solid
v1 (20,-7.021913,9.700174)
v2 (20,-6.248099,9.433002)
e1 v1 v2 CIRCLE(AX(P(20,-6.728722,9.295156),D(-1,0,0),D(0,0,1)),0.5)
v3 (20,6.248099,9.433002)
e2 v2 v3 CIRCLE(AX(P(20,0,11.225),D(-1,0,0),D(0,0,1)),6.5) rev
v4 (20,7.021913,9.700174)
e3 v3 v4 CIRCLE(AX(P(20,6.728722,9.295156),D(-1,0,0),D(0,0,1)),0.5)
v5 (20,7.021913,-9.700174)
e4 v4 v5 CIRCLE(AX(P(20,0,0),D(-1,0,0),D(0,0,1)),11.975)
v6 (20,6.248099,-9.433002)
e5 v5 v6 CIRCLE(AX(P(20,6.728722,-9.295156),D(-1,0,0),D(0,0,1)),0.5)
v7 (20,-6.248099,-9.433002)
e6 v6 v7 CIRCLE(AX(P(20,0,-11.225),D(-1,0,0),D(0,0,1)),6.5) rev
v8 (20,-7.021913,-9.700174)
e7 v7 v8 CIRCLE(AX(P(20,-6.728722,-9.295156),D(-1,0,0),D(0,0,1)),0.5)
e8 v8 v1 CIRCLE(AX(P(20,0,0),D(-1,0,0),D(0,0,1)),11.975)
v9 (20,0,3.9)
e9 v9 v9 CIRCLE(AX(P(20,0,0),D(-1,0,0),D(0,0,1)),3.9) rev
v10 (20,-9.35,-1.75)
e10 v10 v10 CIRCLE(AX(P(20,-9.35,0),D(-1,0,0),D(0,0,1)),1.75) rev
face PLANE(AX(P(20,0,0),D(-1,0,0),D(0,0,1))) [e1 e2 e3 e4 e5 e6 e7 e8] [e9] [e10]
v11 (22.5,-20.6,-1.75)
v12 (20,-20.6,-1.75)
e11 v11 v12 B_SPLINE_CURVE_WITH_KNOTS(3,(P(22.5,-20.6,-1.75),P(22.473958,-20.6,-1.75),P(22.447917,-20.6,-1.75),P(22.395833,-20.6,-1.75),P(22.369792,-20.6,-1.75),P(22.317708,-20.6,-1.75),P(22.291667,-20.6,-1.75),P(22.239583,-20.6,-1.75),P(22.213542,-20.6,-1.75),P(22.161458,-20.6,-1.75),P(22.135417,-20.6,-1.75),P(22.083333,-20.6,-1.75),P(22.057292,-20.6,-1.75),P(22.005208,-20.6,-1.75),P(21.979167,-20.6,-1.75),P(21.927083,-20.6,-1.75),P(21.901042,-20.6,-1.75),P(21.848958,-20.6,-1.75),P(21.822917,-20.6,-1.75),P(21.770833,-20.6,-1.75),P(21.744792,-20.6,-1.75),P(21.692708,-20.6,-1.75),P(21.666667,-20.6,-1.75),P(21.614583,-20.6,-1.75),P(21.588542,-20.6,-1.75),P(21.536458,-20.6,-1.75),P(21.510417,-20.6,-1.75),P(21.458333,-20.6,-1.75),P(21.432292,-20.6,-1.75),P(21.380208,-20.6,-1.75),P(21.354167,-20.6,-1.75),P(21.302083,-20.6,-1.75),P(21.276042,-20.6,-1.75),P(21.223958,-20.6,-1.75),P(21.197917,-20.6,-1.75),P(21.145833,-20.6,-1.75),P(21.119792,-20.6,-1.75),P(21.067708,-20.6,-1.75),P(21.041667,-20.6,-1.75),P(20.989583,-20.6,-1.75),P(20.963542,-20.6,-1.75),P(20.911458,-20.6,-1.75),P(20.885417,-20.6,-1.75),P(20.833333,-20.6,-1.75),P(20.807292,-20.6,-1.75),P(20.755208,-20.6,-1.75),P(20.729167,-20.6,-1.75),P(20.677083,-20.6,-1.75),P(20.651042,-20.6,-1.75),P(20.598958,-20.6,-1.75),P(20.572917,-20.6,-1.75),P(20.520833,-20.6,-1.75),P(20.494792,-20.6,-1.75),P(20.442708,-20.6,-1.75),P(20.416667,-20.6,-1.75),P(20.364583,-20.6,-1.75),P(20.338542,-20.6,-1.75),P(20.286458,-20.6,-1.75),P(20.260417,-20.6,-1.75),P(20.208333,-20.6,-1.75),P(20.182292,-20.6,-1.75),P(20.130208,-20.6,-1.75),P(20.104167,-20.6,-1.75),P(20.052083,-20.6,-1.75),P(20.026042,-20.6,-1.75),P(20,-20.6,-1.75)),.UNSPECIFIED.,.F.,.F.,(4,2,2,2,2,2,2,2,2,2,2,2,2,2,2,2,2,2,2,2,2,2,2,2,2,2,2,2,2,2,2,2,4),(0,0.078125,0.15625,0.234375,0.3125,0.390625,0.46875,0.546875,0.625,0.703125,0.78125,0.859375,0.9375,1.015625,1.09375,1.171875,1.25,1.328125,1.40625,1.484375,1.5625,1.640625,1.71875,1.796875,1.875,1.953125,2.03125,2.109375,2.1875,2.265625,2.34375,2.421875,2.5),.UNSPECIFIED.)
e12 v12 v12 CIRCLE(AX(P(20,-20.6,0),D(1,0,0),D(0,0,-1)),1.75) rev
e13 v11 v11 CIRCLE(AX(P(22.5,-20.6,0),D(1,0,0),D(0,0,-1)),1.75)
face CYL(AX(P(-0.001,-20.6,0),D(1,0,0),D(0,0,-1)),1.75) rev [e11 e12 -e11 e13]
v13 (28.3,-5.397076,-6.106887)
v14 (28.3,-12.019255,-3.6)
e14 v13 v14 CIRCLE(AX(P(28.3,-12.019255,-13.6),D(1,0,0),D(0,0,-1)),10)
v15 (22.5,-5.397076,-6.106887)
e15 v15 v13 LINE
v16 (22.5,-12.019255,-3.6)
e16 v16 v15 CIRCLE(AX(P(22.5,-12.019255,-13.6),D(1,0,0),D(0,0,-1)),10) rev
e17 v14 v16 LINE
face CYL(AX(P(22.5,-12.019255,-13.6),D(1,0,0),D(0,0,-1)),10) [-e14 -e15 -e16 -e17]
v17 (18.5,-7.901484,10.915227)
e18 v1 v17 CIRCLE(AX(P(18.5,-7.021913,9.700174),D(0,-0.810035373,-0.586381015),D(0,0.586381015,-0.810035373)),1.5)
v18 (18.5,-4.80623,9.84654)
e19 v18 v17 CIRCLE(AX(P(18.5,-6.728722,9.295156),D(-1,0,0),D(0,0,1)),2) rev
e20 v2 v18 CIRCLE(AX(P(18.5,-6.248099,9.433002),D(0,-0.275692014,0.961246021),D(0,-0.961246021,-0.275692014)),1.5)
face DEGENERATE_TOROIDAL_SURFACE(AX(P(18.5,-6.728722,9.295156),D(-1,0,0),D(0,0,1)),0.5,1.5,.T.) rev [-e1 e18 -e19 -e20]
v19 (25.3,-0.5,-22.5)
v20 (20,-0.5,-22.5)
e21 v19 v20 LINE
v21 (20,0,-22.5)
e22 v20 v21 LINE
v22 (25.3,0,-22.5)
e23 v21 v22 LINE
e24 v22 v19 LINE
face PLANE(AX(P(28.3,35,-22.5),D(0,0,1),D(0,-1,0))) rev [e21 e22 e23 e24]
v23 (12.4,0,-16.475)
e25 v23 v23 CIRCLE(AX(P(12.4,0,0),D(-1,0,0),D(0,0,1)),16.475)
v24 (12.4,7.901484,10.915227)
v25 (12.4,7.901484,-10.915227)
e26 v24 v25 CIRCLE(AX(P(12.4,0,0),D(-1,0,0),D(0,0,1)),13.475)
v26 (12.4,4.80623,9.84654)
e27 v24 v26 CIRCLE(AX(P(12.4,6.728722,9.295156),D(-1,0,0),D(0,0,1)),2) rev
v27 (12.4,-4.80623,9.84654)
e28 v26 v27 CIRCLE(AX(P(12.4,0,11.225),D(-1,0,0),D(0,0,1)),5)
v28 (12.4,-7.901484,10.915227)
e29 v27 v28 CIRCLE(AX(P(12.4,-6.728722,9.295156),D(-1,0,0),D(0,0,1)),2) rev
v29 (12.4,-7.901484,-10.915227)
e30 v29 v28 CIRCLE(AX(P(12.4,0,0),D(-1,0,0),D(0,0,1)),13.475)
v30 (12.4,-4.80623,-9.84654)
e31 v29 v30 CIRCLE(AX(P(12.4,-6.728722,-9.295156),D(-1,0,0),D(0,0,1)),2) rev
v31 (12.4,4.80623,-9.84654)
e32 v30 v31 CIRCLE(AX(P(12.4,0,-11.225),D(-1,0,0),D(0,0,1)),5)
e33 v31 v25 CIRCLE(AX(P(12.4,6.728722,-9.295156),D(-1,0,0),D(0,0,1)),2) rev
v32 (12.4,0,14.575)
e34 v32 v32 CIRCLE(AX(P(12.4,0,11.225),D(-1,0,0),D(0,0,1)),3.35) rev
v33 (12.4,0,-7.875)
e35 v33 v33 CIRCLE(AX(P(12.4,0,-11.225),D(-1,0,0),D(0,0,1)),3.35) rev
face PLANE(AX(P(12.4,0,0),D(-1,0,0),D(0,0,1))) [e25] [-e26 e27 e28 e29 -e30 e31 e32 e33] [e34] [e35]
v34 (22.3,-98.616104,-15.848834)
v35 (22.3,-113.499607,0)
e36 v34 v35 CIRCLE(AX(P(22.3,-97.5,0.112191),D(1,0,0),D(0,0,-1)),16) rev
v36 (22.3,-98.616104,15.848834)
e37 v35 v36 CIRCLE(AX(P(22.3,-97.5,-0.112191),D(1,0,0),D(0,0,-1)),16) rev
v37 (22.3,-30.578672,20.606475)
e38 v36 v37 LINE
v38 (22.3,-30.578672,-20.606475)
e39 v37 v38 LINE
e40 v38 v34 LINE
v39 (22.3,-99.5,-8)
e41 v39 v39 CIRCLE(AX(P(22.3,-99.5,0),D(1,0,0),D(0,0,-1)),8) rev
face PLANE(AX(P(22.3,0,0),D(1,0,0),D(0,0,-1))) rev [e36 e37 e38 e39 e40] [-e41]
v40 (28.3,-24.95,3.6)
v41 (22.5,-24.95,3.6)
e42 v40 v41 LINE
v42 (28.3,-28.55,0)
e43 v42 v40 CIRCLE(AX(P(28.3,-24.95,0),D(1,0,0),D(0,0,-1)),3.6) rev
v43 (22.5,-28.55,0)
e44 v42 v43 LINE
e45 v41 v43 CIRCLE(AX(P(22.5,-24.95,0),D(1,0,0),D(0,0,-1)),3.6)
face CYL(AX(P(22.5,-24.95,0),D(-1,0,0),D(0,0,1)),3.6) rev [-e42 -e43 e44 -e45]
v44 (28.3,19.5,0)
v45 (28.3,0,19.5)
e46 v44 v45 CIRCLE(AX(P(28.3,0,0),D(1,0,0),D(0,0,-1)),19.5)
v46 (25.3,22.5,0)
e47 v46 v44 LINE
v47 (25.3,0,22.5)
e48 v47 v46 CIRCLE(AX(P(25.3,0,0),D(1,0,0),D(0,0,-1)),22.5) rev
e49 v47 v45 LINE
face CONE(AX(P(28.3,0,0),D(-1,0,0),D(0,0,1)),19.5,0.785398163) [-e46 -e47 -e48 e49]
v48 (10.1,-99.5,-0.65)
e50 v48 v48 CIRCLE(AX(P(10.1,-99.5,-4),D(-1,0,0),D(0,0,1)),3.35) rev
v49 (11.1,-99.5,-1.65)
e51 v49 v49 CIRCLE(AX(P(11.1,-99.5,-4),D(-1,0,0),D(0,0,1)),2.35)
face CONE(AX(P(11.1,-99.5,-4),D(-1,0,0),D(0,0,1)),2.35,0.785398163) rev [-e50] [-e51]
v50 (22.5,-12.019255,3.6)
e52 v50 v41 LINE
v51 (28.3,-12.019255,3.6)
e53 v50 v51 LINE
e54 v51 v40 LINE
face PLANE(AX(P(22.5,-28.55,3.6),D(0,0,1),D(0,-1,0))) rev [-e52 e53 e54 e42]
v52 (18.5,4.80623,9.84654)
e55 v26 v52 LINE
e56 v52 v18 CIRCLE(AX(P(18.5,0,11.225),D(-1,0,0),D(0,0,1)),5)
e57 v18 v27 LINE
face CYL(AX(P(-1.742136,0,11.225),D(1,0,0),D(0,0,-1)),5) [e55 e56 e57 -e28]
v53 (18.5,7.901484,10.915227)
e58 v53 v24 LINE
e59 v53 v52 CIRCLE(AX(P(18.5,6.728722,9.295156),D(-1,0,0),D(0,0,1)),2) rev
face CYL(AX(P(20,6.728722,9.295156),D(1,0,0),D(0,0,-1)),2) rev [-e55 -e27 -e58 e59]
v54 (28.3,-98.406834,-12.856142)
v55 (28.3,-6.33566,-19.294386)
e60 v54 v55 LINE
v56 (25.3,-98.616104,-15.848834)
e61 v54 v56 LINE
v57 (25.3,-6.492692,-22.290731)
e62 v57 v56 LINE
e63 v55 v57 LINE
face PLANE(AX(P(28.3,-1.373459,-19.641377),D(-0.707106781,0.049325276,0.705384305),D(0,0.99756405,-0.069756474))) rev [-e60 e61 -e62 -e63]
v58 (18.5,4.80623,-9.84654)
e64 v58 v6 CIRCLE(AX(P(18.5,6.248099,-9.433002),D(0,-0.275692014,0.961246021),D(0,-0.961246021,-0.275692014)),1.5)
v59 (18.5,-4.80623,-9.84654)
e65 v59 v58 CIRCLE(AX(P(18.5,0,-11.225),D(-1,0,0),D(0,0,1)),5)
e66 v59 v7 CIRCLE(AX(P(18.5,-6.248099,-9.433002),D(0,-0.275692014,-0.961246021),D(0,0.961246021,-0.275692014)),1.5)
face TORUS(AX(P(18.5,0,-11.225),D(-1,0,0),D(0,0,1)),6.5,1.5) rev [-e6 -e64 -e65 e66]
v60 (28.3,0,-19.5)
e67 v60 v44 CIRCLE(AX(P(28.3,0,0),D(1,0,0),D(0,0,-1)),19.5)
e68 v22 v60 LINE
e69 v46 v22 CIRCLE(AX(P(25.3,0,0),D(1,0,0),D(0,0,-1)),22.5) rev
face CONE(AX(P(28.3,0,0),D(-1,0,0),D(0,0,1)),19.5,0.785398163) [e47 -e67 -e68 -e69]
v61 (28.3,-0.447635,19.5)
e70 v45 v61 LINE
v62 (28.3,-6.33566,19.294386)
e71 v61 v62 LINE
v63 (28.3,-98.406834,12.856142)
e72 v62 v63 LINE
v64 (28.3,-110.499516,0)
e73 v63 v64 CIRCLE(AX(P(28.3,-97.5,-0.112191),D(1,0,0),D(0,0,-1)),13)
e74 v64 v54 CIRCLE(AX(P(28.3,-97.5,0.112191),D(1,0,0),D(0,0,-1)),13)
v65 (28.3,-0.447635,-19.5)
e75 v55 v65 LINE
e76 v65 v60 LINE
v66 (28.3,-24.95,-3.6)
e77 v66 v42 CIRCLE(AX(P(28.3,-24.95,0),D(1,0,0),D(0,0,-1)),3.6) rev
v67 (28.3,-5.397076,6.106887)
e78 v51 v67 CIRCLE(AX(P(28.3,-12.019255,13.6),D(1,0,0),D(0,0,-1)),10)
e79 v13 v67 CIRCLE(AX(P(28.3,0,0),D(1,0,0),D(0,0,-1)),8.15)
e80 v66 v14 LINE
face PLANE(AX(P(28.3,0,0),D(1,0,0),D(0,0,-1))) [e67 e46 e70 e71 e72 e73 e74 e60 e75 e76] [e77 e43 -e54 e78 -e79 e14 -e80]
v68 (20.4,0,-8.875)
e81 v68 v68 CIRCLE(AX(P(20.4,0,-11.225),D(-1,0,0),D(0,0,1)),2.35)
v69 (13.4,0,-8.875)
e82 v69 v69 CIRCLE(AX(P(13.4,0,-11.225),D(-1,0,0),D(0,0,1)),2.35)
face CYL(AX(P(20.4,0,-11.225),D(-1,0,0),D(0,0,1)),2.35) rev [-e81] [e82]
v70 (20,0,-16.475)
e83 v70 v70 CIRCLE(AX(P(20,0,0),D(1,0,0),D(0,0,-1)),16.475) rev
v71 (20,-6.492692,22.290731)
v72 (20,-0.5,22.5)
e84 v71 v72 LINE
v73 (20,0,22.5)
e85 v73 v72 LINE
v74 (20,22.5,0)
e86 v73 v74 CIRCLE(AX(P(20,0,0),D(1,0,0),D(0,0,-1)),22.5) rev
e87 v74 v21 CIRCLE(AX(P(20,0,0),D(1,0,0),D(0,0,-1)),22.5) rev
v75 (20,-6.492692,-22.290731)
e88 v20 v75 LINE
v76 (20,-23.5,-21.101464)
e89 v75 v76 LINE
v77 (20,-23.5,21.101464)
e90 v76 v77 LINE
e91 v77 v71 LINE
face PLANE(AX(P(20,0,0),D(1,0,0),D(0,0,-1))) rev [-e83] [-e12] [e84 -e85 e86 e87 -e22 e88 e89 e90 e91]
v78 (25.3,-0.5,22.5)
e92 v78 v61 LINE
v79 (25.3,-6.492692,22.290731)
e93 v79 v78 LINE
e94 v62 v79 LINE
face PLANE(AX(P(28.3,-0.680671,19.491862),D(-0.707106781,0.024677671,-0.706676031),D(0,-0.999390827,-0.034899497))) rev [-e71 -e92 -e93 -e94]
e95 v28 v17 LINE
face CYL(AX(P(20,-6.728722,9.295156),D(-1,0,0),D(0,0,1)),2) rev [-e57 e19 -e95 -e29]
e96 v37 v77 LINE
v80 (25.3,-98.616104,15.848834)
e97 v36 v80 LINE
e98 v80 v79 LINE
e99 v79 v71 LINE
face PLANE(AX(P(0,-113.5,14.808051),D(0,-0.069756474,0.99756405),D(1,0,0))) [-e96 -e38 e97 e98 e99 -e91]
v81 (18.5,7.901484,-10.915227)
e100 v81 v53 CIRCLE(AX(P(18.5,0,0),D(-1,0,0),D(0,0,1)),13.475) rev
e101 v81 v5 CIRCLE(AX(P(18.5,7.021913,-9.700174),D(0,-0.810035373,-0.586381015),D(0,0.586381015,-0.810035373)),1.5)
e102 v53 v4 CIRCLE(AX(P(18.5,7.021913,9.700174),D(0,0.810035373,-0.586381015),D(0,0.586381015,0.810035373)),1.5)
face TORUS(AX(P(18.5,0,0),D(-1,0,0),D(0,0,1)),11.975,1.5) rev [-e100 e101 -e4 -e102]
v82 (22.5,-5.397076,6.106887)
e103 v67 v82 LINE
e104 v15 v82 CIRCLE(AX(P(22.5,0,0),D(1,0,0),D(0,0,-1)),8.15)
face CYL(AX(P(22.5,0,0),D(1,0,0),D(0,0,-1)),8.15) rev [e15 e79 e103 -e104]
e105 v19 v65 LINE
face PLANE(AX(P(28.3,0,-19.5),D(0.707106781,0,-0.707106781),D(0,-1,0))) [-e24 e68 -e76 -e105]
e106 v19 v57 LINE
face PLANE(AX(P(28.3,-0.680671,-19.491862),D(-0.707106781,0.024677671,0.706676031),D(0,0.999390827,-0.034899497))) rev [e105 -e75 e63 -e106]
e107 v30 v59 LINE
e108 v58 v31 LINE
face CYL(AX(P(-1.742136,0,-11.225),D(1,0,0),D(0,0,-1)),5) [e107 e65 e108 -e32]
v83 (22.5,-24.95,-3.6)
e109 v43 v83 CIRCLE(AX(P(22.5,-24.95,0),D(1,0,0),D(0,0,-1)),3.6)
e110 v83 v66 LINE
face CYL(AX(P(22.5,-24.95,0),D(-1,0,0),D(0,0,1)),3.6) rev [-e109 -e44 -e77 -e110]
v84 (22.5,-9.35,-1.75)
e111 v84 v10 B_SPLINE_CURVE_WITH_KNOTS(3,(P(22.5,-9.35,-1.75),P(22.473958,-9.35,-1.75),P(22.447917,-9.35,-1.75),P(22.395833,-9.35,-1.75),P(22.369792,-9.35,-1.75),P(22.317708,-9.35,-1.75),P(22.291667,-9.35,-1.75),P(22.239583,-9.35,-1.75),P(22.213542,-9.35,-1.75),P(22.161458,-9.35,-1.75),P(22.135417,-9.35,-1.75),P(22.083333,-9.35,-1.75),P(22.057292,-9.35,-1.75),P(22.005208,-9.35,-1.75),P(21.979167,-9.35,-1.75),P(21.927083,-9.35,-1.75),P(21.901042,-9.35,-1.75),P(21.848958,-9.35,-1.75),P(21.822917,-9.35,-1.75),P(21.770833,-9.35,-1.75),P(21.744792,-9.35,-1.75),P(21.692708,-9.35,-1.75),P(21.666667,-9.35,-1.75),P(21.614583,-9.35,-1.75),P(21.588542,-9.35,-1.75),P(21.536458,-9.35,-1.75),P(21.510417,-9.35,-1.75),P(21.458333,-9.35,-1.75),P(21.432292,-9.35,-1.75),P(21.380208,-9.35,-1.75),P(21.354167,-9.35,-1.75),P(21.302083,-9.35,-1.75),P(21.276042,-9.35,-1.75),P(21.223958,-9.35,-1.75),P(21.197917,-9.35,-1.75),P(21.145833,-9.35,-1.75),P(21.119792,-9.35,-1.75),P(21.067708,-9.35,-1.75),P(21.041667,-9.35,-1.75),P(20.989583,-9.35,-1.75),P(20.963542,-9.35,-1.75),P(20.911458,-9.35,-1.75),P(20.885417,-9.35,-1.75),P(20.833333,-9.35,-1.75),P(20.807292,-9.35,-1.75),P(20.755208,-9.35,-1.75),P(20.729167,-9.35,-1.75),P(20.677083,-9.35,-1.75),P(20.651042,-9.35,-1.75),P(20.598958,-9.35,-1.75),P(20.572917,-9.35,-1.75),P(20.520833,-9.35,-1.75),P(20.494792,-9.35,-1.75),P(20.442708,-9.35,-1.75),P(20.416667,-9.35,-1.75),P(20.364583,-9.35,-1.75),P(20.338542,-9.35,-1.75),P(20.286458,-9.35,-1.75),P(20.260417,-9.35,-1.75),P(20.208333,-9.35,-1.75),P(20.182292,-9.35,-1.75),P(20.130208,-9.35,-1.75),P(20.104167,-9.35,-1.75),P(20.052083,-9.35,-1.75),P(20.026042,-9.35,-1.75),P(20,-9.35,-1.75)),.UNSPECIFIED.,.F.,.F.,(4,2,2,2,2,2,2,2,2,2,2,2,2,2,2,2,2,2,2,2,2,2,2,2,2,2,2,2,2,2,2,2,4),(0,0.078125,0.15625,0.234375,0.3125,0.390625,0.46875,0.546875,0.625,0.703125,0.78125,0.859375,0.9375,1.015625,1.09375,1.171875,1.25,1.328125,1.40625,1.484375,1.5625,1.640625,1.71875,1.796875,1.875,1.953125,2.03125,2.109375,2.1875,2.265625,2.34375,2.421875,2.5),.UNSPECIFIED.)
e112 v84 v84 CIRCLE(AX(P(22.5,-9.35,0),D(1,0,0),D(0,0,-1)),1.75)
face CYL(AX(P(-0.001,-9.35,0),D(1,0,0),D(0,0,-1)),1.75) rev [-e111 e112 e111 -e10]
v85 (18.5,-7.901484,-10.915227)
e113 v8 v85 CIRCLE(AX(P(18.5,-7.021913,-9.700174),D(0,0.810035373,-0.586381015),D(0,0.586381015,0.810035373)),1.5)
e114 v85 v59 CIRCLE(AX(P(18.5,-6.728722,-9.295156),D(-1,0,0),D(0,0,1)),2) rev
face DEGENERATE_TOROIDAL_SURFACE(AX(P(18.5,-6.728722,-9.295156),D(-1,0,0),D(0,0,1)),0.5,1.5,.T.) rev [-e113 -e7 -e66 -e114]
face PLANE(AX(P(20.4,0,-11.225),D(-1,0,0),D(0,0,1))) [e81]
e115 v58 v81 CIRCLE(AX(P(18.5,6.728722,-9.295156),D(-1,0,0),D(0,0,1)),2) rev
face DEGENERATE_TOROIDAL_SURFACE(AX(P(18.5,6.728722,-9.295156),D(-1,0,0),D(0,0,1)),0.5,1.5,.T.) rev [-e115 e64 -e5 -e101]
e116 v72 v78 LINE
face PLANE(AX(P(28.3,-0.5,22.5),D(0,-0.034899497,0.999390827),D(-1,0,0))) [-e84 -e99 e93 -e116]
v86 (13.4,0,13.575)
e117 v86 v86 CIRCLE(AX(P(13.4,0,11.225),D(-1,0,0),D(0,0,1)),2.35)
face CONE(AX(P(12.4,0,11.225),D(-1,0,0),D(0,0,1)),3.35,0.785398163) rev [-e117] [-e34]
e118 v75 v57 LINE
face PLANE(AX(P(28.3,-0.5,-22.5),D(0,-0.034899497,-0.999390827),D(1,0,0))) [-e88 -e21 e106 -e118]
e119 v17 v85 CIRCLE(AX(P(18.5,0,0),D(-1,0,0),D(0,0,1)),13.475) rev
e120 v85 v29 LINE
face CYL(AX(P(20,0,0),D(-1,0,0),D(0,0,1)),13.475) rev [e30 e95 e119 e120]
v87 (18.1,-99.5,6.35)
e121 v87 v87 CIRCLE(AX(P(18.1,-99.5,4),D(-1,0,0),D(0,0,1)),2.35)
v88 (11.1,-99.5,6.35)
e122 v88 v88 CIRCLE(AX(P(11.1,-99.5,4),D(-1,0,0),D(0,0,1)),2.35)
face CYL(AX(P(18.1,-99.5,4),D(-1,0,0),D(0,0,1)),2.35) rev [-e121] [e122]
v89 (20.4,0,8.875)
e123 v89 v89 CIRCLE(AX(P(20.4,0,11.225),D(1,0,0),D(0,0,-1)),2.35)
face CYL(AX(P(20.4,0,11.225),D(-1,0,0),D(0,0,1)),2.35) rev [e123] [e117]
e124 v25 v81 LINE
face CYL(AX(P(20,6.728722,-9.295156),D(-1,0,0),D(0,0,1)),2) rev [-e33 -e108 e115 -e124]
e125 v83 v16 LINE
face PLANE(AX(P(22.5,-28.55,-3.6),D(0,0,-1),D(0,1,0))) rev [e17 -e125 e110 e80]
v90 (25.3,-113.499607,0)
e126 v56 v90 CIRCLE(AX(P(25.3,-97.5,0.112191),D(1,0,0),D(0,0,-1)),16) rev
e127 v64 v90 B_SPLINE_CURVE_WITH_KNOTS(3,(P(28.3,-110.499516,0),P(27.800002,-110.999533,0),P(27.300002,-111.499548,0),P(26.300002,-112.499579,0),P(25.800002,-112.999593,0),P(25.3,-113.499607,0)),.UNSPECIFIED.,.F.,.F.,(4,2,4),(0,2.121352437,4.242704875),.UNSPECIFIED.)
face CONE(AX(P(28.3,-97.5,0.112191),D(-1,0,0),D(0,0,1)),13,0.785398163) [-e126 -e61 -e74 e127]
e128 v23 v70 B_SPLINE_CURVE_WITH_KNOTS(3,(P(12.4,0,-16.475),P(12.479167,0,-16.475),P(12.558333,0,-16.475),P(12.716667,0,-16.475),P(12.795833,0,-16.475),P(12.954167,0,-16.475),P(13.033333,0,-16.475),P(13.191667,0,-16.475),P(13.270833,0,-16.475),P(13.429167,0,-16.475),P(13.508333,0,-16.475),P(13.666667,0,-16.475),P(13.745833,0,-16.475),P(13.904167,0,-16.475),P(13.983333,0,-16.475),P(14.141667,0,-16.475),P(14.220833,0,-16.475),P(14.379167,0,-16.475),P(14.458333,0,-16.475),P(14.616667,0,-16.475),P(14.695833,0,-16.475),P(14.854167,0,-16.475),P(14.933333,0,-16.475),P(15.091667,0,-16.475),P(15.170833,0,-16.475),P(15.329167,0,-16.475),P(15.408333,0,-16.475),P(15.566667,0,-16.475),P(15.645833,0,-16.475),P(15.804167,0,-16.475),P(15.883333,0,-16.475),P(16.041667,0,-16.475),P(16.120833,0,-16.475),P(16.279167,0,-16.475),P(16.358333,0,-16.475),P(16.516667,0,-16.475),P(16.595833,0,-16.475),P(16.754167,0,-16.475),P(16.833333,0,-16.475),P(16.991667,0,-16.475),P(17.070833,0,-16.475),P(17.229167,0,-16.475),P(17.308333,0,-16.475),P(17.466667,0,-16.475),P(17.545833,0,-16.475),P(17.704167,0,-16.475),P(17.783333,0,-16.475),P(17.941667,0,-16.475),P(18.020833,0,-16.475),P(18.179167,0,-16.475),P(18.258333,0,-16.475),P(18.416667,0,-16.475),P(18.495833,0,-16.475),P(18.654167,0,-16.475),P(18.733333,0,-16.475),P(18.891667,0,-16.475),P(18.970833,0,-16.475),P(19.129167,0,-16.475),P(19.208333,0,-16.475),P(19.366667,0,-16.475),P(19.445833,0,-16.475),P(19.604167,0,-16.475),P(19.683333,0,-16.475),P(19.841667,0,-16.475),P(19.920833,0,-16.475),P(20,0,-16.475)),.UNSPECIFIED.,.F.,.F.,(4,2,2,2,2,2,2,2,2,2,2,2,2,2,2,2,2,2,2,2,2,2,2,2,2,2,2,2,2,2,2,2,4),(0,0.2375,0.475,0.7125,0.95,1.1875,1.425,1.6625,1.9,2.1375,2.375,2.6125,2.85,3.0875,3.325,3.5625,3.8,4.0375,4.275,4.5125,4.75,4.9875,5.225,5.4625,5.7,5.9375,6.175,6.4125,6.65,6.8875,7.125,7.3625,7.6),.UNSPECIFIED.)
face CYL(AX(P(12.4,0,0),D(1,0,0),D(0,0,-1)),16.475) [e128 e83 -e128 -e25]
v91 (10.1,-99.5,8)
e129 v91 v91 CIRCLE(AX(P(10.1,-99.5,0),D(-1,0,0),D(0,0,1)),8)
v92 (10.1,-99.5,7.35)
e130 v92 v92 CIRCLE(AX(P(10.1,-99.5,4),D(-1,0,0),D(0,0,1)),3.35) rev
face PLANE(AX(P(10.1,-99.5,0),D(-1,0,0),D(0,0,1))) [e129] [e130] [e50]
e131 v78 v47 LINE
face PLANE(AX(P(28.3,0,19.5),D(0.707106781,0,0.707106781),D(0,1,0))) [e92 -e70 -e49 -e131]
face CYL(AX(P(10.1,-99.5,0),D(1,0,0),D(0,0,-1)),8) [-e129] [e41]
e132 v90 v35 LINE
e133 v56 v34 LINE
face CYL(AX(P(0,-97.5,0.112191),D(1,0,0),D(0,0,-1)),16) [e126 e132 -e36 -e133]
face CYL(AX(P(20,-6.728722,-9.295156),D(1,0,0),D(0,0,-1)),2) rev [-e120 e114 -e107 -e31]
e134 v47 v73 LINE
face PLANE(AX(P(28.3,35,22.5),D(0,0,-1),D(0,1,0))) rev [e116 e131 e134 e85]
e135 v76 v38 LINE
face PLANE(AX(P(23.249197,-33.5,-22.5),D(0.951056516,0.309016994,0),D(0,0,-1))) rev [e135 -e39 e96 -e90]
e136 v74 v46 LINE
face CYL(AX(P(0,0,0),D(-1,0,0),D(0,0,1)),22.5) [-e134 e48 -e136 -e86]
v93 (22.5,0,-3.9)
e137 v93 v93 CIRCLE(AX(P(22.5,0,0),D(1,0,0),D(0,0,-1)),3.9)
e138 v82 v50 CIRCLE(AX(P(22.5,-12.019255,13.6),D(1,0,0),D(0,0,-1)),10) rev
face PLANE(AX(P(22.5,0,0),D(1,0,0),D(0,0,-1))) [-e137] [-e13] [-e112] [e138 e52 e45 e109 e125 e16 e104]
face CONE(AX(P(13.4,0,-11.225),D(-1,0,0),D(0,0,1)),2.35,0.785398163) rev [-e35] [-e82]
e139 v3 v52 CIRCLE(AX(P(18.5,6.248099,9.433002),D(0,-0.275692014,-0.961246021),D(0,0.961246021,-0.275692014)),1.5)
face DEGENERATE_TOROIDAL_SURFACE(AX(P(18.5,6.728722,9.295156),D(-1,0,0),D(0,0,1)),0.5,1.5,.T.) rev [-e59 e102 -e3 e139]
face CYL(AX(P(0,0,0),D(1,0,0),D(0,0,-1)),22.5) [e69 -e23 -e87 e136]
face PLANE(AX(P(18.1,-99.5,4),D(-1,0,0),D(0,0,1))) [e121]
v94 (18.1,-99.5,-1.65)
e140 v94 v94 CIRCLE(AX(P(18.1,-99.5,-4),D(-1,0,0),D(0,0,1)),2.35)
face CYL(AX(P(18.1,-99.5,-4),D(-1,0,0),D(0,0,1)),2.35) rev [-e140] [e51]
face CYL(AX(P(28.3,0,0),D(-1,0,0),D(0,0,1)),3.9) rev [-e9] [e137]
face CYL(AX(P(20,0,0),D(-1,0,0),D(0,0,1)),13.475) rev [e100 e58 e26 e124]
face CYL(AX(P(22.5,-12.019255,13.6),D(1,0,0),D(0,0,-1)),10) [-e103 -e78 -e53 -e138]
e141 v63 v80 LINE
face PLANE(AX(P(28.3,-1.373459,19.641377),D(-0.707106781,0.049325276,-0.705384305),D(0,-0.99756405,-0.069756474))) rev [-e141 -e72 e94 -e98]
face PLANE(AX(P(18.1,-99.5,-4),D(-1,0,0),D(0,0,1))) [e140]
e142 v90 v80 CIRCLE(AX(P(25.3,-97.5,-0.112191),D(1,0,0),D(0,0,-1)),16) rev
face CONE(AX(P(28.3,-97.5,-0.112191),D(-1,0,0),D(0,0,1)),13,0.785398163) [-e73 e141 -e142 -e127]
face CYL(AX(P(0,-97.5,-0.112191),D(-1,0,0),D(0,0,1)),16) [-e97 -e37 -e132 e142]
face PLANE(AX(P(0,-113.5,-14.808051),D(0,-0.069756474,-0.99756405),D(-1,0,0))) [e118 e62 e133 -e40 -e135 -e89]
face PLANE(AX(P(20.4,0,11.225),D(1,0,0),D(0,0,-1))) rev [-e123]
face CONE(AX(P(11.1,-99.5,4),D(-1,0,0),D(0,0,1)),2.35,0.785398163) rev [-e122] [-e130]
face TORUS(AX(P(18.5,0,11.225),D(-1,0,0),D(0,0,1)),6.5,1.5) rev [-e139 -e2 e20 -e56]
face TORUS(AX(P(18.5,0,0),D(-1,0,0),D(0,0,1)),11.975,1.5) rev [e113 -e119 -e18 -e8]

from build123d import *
from OCP.BRepFilletAPI import BRepFilletAPI_MakeChamfer

# Parameters (mm, degrees)
SKETCH1_W           = 20
SKETCH1_H           = 20
BOSS_EXTRUDE1_DEPTH = 20
SKETCH2_W           = 45
SKETCH2_H           = 70
BOSS_EXTRUDE2_DEPTH = 8.3
CUT_EXTRUDE1_DEPTH  = 5.8
FILLET1_R           = 3.6
FILLET2_R           = 10
SKETCH5_R           = 3.9
CUT_EXTRUDE2_DEPTH  = 51.320373608
CUT_EXTRUDE3_REACH  = 49.302
SKETCH6_R           = 1.75
SKETCH13_W          = 20
SKETCH13_H          = 20
CUT_EXTRUDE9_DEPTH  = 20
SKETCH14_R          = 16.475
BOSS_EXTRUDE3_DEPTH = 7.6
SKETCH15_W          = 8.3
SKETCH15_H          = 45
CUT_EXTRUDE10_DEPTH = 12.5
SKETCH16_R          = 13.475
CUT_EXTRUDE11_DEPTH = 7.6
SKETCH18_W          = 8.3
SKETCH18_H          = 45
BOSS_EXTRUDE4_DEPTH = 78.5
FILLET5_R           = 22.5
SKETCH20_W          = 45
SKETCH20_H          = 80
CUT_EXTRUDE12_DEPTH = 2.3
SKETCH21_R          = 8
BOSS_EXTRUDE5_DEPTH = 12.2
CHAMFER1_SIZE       = 3.249196962
CHAMFER1_SIZE_2     = 10
CHAMFER2_SIZE       = 110
CHAMFER2_SIZE2      = 7.691949314
CHAMFER3_SIZE       = 3
FILLET6_R           = 16
CHAMFER4_SIZE       = 3
SKETCH23_R          = 2.35
CUT_EXTRUDE13_DEPTH = 8
CHAMFER5_SIZE       = 1
SKETCH24_R          = 5
BOSS_EXTRUDE6_DEPTH = 7.6
FILLET8_R           = 2
FILLET9_R           = 1.5
SKETCH27_R          = 2.35
CUT_EXTRUDE14_DEPTH = 8
CHAMFER6_SIZE       = 1


# Some blends are built 0.0001 mm under size
with BuildPart() as part:
    # Sketch1 → Boss-Extrude1 (new body)
    with BuildSketch(Plane(origin=(0, 0, 0), x_dir=(0, 0, -1), z_dir=(1, 0, 0))):
        Rectangle(SKETCH1_W, SKETCH1_H)
    extrude(amount=BOSS_EXTRUDE1_DEPTH)

    # Sketch2 → Boss-Extrude2 (add)
    with BuildSketch(Plane(origin=(20, 0, 0), x_dir=(0, 0, -1), z_dir=(1, 0, 0))):
        Rectangle(SKETCH2_W, SKETCH2_H)
    extrude(amount=BOSS_EXTRUDE2_DEPTH)

    # Sketch4 → Cut-Extrude1 (cut)
    with BuildSketch(Plane(origin=(28.3, 0, 0), x_dir=(0, 0, -1), z_dir=(1, 0, 0))):
        with BuildLine():
            Line((3.6, -28.55), (-3.6, -28.55))
            Line((-3.6, -28.55), (-3.6, -7.311805523))
            ThreePointArc((-3.6, -7.311805523), (0, 8.15), (3.6, -7.311805523))
            Line((3.6, -7.311805523), (3.6, -28.55))
        make_face()
    extrude(amount=-CUT_EXTRUDE1_DEPTH, mode=Mode.SUBTRACT)

    # Fillet1
    fillet1_edges = [part.edges().sort_by_distance(p)[0] for p in [
        (25.4, -28.55, 3.6),
        (25.4, -28.55, -3.6),
    ]]
    fillet(fillet1_edges, radius=FILLET1_R - 0.0001)  # a hair under: the kernel refuses the full size

    # Fillet2
    fillet2_edges = [part.edges().sort_by_distance(p)[0] for p in [
        (25.4, -7.311805523, 3.6),
        (25.4, -7.311805523, -3.6),
    ]]
    fillet(fillet2_edges, radius=FILLET2_R)

    # Sketch5 → Cut-Extrude2 (cut, through all)
    with BuildSketch(Plane.ZY):
        Circle(SKETCH5_R)
    extrude(amount=-CUT_EXTRUDE2_DEPTH, mode=Mode.SUBTRACT)

    # Sketch6 → Cut-Extrude3 (cut, up to next)
    with BuildSketch(Plane(origin=(22.5, 0, 0), x_dir=(0, 0, -1), z_dir=(1, 0, 0)), mode=Mode.PRIVATE) as cut_extrude3_sk1:
        with Locations((0, -20.6)):
            Circle(SKETCH6_R)
    cut_extrude3_tool1 = extrude(cut_extrude3_sk1.sketch, amount=-CUT_EXTRUDE3_REACH, mode=Mode.PRIVATE) & part.part
    # Sketch6 → Cut-Extrude3 (cut, up to next)
    with BuildSketch(Plane(origin=(22.5, 0, 0), x_dir=(0, 0, -1), z_dir=(1, 0, 0)), mode=Mode.PRIVATE) as cut_extrude3_sk2:
        with Locations((0, -9.35)):
            Circle(SKETCH6_R)
    cut_extrude3_tool2 = extrude(cut_extrude3_sk2.sketch, amount=-CUT_EXTRUDE3_REACH, mode=Mode.PRIVATE) & part.part
    add(cut_extrude3_tool1.solids().sort_by_distance((22.5, -20.6, 0))[0], mode=Mode.SUBTRACT)
    add(cut_extrude3_tool2.solids().sort_by_distance((22.5, -9.35, 0))[0], mode=Mode.SUBTRACT)

    # Sketch13 → Cut-Extrude9 (cut)
    with BuildSketch(Plane.ZY):
        Rectangle(SKETCH13_W, SKETCH13_H)
    extrude(amount=-CUT_EXTRUDE9_DEPTH, mode=Mode.SUBTRACT)

    # Sketch14 → Boss-Extrude3 (add)
    with BuildSketch(Plane.ZY.offset(-20)):
        with Locations(Location((0, 0, 0), (0, 0, 180))):
            Circle(SKETCH14_R)
    extrude(amount=BOSS_EXTRUDE3_DEPTH)

    # Sketch15 → Cut-Extrude10 (cut)
    with BuildSketch(Plane(origin=(0, 35, 0), x_dir=(1, 0, 0), z_dir=(0, 1, 0))):
        with Locations((24.15, 0)):
            Rectangle(SKETCH15_W, SKETCH15_H)
    extrude(amount=-CUT_EXTRUDE10_DEPTH, mode=Mode.SUBTRACT)

    # Sketch16 → Cut-Extrude11 (cut)
    with BuildSketch(Plane.ZY.offset(-12.4)):
        Circle(SKETCH16_R)
    extrude(amount=-CUT_EXTRUDE11_DEPTH, mode=Mode.SUBTRACT)

    # Sketch18 → Boss-Extrude4 (add)
    with BuildSketch(Plane.XZ.offset(35)):
        with Locations((24.15, 0)):
            Rectangle(SKETCH18_W, SKETCH18_H)
    extrude(amount=BOSS_EXTRUDE4_DEPTH)

    # Fillet5
    fillet5_edges = [part.edges().sort_by_distance(p)[0] for p in [
        (24.15, 22.5, -22.5),
        (24.15, 22.5, 22.5),
    ]]
    fillet(fillet5_edges, radius=FILLET5_R - 0.0001)  # a hair under: the kernel refuses the full size

    # Sketch20 → Cut-Extrude12 (cut)
    with BuildSketch(Plane.ZY.offset(-20)):
        with Locations((0, -73.5)):
            Rectangle(SKETCH20_W, SKETCH20_H)
    extrude(amount=-CUT_EXTRUDE12_DEPTH, mode=Mode.SUBTRACT)

    # Sketch21 → Boss-Extrude5 (add)
    with BuildSketch(Plane.ZY.offset(-22.3)):
        with Locations(Location((0, -99.5, 0), (0, 0, 180))):
            Circle(SKETCH21_R)
    extrude(amount=BOSS_EXTRUDE5_DEPTH)

    # Chamfer1
    # the kernel refuses this chamfer: 10, 3.249196962 mm, written as the material it takes off along each edge
    with BuildSketch(Plane(origin=(20, -33.5, 48.45289629), x_dir=(0.9936991275921845, -0.11208052383233842, 0), z_dir=(0, 0, -1))) as chamfer1_piece_1_section:
        Polygon((CHAMFER1_SIZE * 0.993699127693, -CHAMFER1_SIZE * 0.112080523844), (-CHAMFER1_SIZE_2 * 0.112080523832, -CHAMFER1_SIZE_2 * 0.993699127592), (0, 0), align=None)
    chamfer1_piece_1 = extrude(amount=96.905792579, mode=Mode.PRIVATE)
    chamfer1_piece_1 = split(chamfer1_piece_1, bisect_by=Plane(origin=(22.3, -29.773369579, 0), z_dir=(-1, 0, 0)), keep=Keep.TOP, mode=Mode.PRIVATE)
    add(chamfer1_piece_1, mode=Mode.SUBTRACT)

    # Chamfer2: one chamfer whose edges measure the first distance from different faces: ONE call of the kernel's chamfer builder (chamfer() names one face for all edges)
    chamfer2_edges_1 = [part.edges().sort_by_distance(p)[0] for p in [
        (25.3, -113.5, -22.5),
    ]]
    chamfer2_side_1 = [part.faces().sort_by_distance(p)[0] for p in [
        (24.956924265, -53.138870665, -22.5),
    ]]
    chamfer2_edges_2 = [part.edges().sort_by_distance(p)[0] for p in [
        (25.3, -113.5, 22.5),
    ]]
    chamfer2_side_2 = [part.faces().sort_by_distance(p)[0] for p in [
        (24.956924265, -53.138870665, 22.5),
    ]]
    chamfer2 = BRepFilletAPI_MakeChamfer(part.part.solid().wrapped)
    for e in chamfer2_edges_1:
        chamfer2.Add(CHAMFER2_SIZE, CHAMFER2_SIZE2, e.wrapped, chamfer2_side_1[0].wrapped)  # the first distance lies on this face
    for e in chamfer2_edges_2:
        chamfer2.Add(CHAMFER2_SIZE, CHAMFER2_SIZE2, e.wrapped, chamfer2_side_2[0].wrapped)  # the first distance lies on this face
    add(Compound.cast(chamfer2.Shape()), mode=Mode.REPLACE)

    # Chamfer3
    # the kernel refuses this chamfer: 3 mm, written as the material it takes off along each edge
    with BuildSketch(Plane(origin=(36.099824275, -3.5, -22.5), x_dir=(0, -0.9976567869548854, 0.06841736214481542), z_dir=(-1, 0, 0))) as chamfer3_piece_1:
        Polygon((CHAMFER3_SIZE * 0.99999909909, CHAMFER3_SIZE * 0.00134231857559), (-CHAMFER3_SIZE * 0.997656786955, CHAMFER3_SIZE * 0.0684173621448), (0, 0), align=None)
    extrude(amount=23.89964855, mode=Mode.SUBTRACT)
    with BuildSketch(Plane(origin=(12.200175725, -3.5, 22.5), x_dir=(0, 0.999999099090015, 0.0013423185755924486), z_dir=(1, 0, 0))) as chamfer3_piece_2:
        Polygon((CHAMFER3_SIZE * 0.99999909909, -CHAMFER3_SIZE * 0.00134231857559), (-CHAMFER3_SIZE * 0.997656786955, -CHAMFER3_SIZE * 0.0684173621448), (0, 0), align=None)
    extrude(amount=23.89964855, mode=Mode.SUBTRACT)

    # Fillet6
    # the kernel refuses this fillet: 16 mm, written as the material it takes off along each edge
    with BuildSketch(Plane(origin=(65.600603446, -113.5, -14.808050686), x_dir=(0, 0, 1), z_dir=(-1, 0, 0))) as fillet6_piece_1:
        with BuildLine():
            CenterArc((FILLET6_R * 0.932515086138, FILLET6_R), FILLET6_R, 184, 86)
            Line((-FILLET6_R * 0.0650489641222, FILLET6_R * 0.930243526256), (0, 0))
            Line((0, 0), (FILLET6_R * 0.932515086138, 0))
        make_face()
    extrude(amount=80.601206891, mode=Mode.SUBTRACT)
    with BuildSketch(Plane(origin=(-15.000603446, -113.5, 14.808050686), x_dir=(0, 0.9975640502598242, 0.06975647374412544), z_dir=(1, 0, 0))) as fillet6_piece_2:
        with BuildLine():
            CenterArc((FILLET6_R * 0.932515086138, -FILLET6_R), FILLET6_R, 90, 86)
            Line((-FILLET6_R * 0.0650489641222, -FILLET6_R * 0.930243526256), (0, 0))
            Line((0, 0), (FILLET6_R * 0.932515086138, 0))
        make_face()
    extrude(amount=80.601206891, mode=Mode.SUBTRACT)

    # Chamfer4
    # the kernel refuses this chamfer: 3 mm, written as the material it takes off along each edge
    with BuildSketch(Plane(origin=(28.3, 0.0001, 22.5), x_dir=(0.027495876610587916, 0, -0.9996219169112968), z_dir=(0, -1, 0)), Plane(origin=(28.3, -8.215048964, -22.5), x_dir=(0.027495876610586768, 0, 0.9996219169112968), z_dir=(0, 1, 0))) as chamfer4_piece_1:
        Polygon((CHAMFER4_SIZE * 0.999621916911, -CHAMFER4_SIZE * 0.0274958766106), (-CHAMFER4_SIZE * 0.0274958766106, -CHAMFER4_SIZE * 0.999621916911), (0, 0), align=None)
    extrude(amount=8.215148964, mode=Mode.SUBTRACT)
    with BuildSketch(Plane(origin=(28.3, 0.0001, 0.0001), x_dir=(0, 1, 0), z_dir=(0, 0, -1))) as chamfer4_piece_2:
        Polygon((22.4999 - CHAMFER4_SIZE, 0), (22.4999, -CHAMFER4_SIZE), (22.4999, 0), align=None)
    revolve(axis=Axis((28.3, 0.0001, 0.0001), (1, 0, 0)), revolution_arc=90, mode=Mode.SUBTRACT)
    with BuildSketch(Plane(origin=(28.3, 0.0001, -0.0001), x_dir=(0, 0, -1), z_dir=(0, -1, 0))) as chamfer4_piece_3:
        Polygon((22.4999 - CHAMFER4_SIZE, 0), (22.4999, -CHAMFER4_SIZE), (22.4999, 0), align=None)
    revolve(axis=Axis((28.3, 0.0001, -0.0001), (1, 0, 0)), revolution_arc=90, mode=Mode.SUBTRACT)
    with BuildSketch(Plane(origin=(28.3, 1.203563342, 22.828905189), x_dir=(0.027495876610586778, 0.0697301000010753, -0.9971868881625227), z_dir=(0, -0.9975640502598243, -0.06975647374412554))) as chamfer4_piece_4:
        Polygon((CHAMFER4_SIZE * 0.999621916911, -CHAMFER4_SIZE * 0.0274958766106), (-CHAMFER4_SIZE * 0.0274958766106, -CHAMFER4_SIZE * 0.999621916911), (0, 0), align=None)
    extrude(amount=100.063416375, mode=Mode.SUBTRACT)
    with BuildSketch(Plane(origin=(28.3, 7.210349165, -22.769251326), x_dir=(0.02749587661058679, 0.03488630179317817, 0.9990129742483882), z_dir=(0, -0.9993908270190893, 0.03489949670268572))) as chamfer4_piece_5:
        Polygon((CHAMFER4_SIZE * 0.999621916911, CHAMFER4_SIZE * 0.0274958766106), (-CHAMFER4_SIZE * 0.0274958766106, CHAMFER4_SIZE * 0.999621916911), (0, 0), align=None)
    extrude(amount=21.42644289, mode=Mode.SUBTRACT)
    with BuildSketch(Plane(origin=(28.3, 7.210349164, 22.769251326), x_dir=(0.02749587661058677, 0.034886301793392936, -0.9990129742483806), z_dir=(0, -0.9993908270190818, -0.03489949670290056))) as chamfer4_piece_6:
        Polygon((CHAMFER4_SIZE * 0.999621916911, -CHAMFER4_SIZE * 0.0274958766106), (-CHAMFER4_SIZE * 0.0274958766106, -CHAMFER4_SIZE * 0.999621916911), (0, 0), align=None)
    extrude(amount=21.42644289, mode=Mode.SUBTRACT)
    with BuildSketch(Plane(origin=(28.3, 1.203563342, -22.828905189), x_dir=(0.027495876610586778, 0.06973010000107512, 0.9971868881625227), z_dir=(0, -0.9975640502598243, 0.06975647374412534))) as chamfer4_piece_7:
        Polygon((CHAMFER4_SIZE * 0.999621916911, CHAMFER4_SIZE * 0.0274958766106), (-CHAMFER4_SIZE * 0.0274958766106, CHAMFER4_SIZE * 0.999621916911), (0, 0), align=None)
    extrude(amount=100.063416375, mode=Mode.SUBTRACT)
    with BuildSketch(Plane(origin=(28.3, -97.5, -0.112190692), x_dir=(0, -0.9999754161991546, 0.007011918234514749), z_dir=(0, -0.007011918234514749, -0.9999754161991546))) as chamfer4_piece_8:
        Polygon((16 - CHAMFER4_SIZE, 0), (16, CHAMFER4_SIZE), (16, 0), align=None)
    revolve(axis=Axis((28.3, -97.5, -0.112190692), (-1, 0, 0)), revolution_arc=85.598243387, mode=Mode.SUBTRACT)
    with BuildSketch(Plane(origin=(28.3, -97.5, 0.112190692), x_dir=(0, -0.9999754161989443, -0.0070119182645099615), z_dir=(0, -0.0070119182645099615, 0.9999754161989443))) as chamfer4_piece_9:
        Polygon((16 - CHAMFER4_SIZE, 0), (16, -CHAMFER4_SIZE), (16, 0), align=None)
    revolve(axis=Axis((28.3, -97.5, 0.112190692), (1, 0, 0)), revolution_arc=85.598243385, mode=Mode.SUBTRACT)
    with BuildSketch(Plane(origin=(28.3, 22.5, -0.0001), x_dir=(0.027495876610589064, -0.9996219169112965, 0), z_dir=(0, 0, 1))) as chamfer4_piece_10:
        Polygon((CHAMFER4_SIZE * 0.999621916911, -CHAMFER4_SIZE * 0.0274958766106), (-CHAMFER4_SIZE * 0.0274958766106, -CHAMFER4_SIZE * 0.999621916911), (0, 0), align=None)
    extrude(amount=0.0002, mode=Mode.SUBTRACT)

    # Sketch23 → Cut-Extrude13 (cut)
    with BuildSketch(Plane.ZY.offset(-10.1)):
        with Locations((-4, -99.5)):
            Circle(SKETCH23_R)
        with Locations((4, -99.5)):
            Circle(SKETCH23_R)
    extrude(amount=-CUT_EXTRUDE13_DEPTH, mode=Mode.SUBTRACT)

    # Chamfer5
    chamfer5_edges = [part.edges().sort_by_distance(p)[0] for p in [
        (10.1, -99.5, 1.65),
        (10.1, -99.5, -6.35),
    ]]
    chamfer(chamfer5_edges, length=CHAMFER5_SIZE)

    # Sketch24 → Boss-Extrude6 (add)
    with BuildSketch(Plane.ZY.offset(-20)):
        with Locations((-11.225, 0)):
            Circle(SKETCH24_R)
        with Locations((11.225, 0)):
            Circle(SKETCH24_R)
    extrude(amount=BOSS_EXTRUDE6_DEPTH)

    # Fillet8
    fillet8_edges = [part.edges().sort_by_distance(p)[0] for p in [
        (16.2, -4.810944453, 12.586915367),
        (16.2, 4.810944453, 12.586915367),
        (16.2, 4.810944453, -12.586915367),
        (16.2, -4.810944453, -12.586915367),
    ]]
    fillet(fillet8_edges, radius=FILLET8_R)

    # Fillet9
    fillet9_edges = [part.edges().sort_by_distance(p)[0] for p in [
        (20, 0, 6.225),
        (20, -13.475, 0),
        (20, 13.475, 0),
        (20, 0, -6.225),
        (20, -6.075999698, -11.185646156),
        (20, 6.075999698, -11.185646156),
        (20, 6.075999698, 11.185646156),
        (20, -6.075999698, 11.185646156),
    ]]
    fillet(fillet9_edges, radius=FILLET9_R)

    # Sketch27 → Cut-Extrude14 (cut)
    with BuildSketch(Plane.ZY.offset(-12.4)):
        with Locations((-11.225, 0)):
            Circle(SKETCH27_R)
        with Locations(Location((11.225, 0, 0), (0, 0, 180))):
            Circle(SKETCH27_R)
    extrude(amount=-CUT_EXTRUDE14_DEPTH, mode=Mode.SUBTRACT)

    # Chamfer6
    chamfer6_edges = [part.edges().sort_by_distance(p)[0] for p in [
        (12.4, 0, -13.575),
        (12.4, 0, 13.575),
    ]]
    chamfer(chamfer6_edges, length=CHAMFER6_SIZE)


solid = part.part
